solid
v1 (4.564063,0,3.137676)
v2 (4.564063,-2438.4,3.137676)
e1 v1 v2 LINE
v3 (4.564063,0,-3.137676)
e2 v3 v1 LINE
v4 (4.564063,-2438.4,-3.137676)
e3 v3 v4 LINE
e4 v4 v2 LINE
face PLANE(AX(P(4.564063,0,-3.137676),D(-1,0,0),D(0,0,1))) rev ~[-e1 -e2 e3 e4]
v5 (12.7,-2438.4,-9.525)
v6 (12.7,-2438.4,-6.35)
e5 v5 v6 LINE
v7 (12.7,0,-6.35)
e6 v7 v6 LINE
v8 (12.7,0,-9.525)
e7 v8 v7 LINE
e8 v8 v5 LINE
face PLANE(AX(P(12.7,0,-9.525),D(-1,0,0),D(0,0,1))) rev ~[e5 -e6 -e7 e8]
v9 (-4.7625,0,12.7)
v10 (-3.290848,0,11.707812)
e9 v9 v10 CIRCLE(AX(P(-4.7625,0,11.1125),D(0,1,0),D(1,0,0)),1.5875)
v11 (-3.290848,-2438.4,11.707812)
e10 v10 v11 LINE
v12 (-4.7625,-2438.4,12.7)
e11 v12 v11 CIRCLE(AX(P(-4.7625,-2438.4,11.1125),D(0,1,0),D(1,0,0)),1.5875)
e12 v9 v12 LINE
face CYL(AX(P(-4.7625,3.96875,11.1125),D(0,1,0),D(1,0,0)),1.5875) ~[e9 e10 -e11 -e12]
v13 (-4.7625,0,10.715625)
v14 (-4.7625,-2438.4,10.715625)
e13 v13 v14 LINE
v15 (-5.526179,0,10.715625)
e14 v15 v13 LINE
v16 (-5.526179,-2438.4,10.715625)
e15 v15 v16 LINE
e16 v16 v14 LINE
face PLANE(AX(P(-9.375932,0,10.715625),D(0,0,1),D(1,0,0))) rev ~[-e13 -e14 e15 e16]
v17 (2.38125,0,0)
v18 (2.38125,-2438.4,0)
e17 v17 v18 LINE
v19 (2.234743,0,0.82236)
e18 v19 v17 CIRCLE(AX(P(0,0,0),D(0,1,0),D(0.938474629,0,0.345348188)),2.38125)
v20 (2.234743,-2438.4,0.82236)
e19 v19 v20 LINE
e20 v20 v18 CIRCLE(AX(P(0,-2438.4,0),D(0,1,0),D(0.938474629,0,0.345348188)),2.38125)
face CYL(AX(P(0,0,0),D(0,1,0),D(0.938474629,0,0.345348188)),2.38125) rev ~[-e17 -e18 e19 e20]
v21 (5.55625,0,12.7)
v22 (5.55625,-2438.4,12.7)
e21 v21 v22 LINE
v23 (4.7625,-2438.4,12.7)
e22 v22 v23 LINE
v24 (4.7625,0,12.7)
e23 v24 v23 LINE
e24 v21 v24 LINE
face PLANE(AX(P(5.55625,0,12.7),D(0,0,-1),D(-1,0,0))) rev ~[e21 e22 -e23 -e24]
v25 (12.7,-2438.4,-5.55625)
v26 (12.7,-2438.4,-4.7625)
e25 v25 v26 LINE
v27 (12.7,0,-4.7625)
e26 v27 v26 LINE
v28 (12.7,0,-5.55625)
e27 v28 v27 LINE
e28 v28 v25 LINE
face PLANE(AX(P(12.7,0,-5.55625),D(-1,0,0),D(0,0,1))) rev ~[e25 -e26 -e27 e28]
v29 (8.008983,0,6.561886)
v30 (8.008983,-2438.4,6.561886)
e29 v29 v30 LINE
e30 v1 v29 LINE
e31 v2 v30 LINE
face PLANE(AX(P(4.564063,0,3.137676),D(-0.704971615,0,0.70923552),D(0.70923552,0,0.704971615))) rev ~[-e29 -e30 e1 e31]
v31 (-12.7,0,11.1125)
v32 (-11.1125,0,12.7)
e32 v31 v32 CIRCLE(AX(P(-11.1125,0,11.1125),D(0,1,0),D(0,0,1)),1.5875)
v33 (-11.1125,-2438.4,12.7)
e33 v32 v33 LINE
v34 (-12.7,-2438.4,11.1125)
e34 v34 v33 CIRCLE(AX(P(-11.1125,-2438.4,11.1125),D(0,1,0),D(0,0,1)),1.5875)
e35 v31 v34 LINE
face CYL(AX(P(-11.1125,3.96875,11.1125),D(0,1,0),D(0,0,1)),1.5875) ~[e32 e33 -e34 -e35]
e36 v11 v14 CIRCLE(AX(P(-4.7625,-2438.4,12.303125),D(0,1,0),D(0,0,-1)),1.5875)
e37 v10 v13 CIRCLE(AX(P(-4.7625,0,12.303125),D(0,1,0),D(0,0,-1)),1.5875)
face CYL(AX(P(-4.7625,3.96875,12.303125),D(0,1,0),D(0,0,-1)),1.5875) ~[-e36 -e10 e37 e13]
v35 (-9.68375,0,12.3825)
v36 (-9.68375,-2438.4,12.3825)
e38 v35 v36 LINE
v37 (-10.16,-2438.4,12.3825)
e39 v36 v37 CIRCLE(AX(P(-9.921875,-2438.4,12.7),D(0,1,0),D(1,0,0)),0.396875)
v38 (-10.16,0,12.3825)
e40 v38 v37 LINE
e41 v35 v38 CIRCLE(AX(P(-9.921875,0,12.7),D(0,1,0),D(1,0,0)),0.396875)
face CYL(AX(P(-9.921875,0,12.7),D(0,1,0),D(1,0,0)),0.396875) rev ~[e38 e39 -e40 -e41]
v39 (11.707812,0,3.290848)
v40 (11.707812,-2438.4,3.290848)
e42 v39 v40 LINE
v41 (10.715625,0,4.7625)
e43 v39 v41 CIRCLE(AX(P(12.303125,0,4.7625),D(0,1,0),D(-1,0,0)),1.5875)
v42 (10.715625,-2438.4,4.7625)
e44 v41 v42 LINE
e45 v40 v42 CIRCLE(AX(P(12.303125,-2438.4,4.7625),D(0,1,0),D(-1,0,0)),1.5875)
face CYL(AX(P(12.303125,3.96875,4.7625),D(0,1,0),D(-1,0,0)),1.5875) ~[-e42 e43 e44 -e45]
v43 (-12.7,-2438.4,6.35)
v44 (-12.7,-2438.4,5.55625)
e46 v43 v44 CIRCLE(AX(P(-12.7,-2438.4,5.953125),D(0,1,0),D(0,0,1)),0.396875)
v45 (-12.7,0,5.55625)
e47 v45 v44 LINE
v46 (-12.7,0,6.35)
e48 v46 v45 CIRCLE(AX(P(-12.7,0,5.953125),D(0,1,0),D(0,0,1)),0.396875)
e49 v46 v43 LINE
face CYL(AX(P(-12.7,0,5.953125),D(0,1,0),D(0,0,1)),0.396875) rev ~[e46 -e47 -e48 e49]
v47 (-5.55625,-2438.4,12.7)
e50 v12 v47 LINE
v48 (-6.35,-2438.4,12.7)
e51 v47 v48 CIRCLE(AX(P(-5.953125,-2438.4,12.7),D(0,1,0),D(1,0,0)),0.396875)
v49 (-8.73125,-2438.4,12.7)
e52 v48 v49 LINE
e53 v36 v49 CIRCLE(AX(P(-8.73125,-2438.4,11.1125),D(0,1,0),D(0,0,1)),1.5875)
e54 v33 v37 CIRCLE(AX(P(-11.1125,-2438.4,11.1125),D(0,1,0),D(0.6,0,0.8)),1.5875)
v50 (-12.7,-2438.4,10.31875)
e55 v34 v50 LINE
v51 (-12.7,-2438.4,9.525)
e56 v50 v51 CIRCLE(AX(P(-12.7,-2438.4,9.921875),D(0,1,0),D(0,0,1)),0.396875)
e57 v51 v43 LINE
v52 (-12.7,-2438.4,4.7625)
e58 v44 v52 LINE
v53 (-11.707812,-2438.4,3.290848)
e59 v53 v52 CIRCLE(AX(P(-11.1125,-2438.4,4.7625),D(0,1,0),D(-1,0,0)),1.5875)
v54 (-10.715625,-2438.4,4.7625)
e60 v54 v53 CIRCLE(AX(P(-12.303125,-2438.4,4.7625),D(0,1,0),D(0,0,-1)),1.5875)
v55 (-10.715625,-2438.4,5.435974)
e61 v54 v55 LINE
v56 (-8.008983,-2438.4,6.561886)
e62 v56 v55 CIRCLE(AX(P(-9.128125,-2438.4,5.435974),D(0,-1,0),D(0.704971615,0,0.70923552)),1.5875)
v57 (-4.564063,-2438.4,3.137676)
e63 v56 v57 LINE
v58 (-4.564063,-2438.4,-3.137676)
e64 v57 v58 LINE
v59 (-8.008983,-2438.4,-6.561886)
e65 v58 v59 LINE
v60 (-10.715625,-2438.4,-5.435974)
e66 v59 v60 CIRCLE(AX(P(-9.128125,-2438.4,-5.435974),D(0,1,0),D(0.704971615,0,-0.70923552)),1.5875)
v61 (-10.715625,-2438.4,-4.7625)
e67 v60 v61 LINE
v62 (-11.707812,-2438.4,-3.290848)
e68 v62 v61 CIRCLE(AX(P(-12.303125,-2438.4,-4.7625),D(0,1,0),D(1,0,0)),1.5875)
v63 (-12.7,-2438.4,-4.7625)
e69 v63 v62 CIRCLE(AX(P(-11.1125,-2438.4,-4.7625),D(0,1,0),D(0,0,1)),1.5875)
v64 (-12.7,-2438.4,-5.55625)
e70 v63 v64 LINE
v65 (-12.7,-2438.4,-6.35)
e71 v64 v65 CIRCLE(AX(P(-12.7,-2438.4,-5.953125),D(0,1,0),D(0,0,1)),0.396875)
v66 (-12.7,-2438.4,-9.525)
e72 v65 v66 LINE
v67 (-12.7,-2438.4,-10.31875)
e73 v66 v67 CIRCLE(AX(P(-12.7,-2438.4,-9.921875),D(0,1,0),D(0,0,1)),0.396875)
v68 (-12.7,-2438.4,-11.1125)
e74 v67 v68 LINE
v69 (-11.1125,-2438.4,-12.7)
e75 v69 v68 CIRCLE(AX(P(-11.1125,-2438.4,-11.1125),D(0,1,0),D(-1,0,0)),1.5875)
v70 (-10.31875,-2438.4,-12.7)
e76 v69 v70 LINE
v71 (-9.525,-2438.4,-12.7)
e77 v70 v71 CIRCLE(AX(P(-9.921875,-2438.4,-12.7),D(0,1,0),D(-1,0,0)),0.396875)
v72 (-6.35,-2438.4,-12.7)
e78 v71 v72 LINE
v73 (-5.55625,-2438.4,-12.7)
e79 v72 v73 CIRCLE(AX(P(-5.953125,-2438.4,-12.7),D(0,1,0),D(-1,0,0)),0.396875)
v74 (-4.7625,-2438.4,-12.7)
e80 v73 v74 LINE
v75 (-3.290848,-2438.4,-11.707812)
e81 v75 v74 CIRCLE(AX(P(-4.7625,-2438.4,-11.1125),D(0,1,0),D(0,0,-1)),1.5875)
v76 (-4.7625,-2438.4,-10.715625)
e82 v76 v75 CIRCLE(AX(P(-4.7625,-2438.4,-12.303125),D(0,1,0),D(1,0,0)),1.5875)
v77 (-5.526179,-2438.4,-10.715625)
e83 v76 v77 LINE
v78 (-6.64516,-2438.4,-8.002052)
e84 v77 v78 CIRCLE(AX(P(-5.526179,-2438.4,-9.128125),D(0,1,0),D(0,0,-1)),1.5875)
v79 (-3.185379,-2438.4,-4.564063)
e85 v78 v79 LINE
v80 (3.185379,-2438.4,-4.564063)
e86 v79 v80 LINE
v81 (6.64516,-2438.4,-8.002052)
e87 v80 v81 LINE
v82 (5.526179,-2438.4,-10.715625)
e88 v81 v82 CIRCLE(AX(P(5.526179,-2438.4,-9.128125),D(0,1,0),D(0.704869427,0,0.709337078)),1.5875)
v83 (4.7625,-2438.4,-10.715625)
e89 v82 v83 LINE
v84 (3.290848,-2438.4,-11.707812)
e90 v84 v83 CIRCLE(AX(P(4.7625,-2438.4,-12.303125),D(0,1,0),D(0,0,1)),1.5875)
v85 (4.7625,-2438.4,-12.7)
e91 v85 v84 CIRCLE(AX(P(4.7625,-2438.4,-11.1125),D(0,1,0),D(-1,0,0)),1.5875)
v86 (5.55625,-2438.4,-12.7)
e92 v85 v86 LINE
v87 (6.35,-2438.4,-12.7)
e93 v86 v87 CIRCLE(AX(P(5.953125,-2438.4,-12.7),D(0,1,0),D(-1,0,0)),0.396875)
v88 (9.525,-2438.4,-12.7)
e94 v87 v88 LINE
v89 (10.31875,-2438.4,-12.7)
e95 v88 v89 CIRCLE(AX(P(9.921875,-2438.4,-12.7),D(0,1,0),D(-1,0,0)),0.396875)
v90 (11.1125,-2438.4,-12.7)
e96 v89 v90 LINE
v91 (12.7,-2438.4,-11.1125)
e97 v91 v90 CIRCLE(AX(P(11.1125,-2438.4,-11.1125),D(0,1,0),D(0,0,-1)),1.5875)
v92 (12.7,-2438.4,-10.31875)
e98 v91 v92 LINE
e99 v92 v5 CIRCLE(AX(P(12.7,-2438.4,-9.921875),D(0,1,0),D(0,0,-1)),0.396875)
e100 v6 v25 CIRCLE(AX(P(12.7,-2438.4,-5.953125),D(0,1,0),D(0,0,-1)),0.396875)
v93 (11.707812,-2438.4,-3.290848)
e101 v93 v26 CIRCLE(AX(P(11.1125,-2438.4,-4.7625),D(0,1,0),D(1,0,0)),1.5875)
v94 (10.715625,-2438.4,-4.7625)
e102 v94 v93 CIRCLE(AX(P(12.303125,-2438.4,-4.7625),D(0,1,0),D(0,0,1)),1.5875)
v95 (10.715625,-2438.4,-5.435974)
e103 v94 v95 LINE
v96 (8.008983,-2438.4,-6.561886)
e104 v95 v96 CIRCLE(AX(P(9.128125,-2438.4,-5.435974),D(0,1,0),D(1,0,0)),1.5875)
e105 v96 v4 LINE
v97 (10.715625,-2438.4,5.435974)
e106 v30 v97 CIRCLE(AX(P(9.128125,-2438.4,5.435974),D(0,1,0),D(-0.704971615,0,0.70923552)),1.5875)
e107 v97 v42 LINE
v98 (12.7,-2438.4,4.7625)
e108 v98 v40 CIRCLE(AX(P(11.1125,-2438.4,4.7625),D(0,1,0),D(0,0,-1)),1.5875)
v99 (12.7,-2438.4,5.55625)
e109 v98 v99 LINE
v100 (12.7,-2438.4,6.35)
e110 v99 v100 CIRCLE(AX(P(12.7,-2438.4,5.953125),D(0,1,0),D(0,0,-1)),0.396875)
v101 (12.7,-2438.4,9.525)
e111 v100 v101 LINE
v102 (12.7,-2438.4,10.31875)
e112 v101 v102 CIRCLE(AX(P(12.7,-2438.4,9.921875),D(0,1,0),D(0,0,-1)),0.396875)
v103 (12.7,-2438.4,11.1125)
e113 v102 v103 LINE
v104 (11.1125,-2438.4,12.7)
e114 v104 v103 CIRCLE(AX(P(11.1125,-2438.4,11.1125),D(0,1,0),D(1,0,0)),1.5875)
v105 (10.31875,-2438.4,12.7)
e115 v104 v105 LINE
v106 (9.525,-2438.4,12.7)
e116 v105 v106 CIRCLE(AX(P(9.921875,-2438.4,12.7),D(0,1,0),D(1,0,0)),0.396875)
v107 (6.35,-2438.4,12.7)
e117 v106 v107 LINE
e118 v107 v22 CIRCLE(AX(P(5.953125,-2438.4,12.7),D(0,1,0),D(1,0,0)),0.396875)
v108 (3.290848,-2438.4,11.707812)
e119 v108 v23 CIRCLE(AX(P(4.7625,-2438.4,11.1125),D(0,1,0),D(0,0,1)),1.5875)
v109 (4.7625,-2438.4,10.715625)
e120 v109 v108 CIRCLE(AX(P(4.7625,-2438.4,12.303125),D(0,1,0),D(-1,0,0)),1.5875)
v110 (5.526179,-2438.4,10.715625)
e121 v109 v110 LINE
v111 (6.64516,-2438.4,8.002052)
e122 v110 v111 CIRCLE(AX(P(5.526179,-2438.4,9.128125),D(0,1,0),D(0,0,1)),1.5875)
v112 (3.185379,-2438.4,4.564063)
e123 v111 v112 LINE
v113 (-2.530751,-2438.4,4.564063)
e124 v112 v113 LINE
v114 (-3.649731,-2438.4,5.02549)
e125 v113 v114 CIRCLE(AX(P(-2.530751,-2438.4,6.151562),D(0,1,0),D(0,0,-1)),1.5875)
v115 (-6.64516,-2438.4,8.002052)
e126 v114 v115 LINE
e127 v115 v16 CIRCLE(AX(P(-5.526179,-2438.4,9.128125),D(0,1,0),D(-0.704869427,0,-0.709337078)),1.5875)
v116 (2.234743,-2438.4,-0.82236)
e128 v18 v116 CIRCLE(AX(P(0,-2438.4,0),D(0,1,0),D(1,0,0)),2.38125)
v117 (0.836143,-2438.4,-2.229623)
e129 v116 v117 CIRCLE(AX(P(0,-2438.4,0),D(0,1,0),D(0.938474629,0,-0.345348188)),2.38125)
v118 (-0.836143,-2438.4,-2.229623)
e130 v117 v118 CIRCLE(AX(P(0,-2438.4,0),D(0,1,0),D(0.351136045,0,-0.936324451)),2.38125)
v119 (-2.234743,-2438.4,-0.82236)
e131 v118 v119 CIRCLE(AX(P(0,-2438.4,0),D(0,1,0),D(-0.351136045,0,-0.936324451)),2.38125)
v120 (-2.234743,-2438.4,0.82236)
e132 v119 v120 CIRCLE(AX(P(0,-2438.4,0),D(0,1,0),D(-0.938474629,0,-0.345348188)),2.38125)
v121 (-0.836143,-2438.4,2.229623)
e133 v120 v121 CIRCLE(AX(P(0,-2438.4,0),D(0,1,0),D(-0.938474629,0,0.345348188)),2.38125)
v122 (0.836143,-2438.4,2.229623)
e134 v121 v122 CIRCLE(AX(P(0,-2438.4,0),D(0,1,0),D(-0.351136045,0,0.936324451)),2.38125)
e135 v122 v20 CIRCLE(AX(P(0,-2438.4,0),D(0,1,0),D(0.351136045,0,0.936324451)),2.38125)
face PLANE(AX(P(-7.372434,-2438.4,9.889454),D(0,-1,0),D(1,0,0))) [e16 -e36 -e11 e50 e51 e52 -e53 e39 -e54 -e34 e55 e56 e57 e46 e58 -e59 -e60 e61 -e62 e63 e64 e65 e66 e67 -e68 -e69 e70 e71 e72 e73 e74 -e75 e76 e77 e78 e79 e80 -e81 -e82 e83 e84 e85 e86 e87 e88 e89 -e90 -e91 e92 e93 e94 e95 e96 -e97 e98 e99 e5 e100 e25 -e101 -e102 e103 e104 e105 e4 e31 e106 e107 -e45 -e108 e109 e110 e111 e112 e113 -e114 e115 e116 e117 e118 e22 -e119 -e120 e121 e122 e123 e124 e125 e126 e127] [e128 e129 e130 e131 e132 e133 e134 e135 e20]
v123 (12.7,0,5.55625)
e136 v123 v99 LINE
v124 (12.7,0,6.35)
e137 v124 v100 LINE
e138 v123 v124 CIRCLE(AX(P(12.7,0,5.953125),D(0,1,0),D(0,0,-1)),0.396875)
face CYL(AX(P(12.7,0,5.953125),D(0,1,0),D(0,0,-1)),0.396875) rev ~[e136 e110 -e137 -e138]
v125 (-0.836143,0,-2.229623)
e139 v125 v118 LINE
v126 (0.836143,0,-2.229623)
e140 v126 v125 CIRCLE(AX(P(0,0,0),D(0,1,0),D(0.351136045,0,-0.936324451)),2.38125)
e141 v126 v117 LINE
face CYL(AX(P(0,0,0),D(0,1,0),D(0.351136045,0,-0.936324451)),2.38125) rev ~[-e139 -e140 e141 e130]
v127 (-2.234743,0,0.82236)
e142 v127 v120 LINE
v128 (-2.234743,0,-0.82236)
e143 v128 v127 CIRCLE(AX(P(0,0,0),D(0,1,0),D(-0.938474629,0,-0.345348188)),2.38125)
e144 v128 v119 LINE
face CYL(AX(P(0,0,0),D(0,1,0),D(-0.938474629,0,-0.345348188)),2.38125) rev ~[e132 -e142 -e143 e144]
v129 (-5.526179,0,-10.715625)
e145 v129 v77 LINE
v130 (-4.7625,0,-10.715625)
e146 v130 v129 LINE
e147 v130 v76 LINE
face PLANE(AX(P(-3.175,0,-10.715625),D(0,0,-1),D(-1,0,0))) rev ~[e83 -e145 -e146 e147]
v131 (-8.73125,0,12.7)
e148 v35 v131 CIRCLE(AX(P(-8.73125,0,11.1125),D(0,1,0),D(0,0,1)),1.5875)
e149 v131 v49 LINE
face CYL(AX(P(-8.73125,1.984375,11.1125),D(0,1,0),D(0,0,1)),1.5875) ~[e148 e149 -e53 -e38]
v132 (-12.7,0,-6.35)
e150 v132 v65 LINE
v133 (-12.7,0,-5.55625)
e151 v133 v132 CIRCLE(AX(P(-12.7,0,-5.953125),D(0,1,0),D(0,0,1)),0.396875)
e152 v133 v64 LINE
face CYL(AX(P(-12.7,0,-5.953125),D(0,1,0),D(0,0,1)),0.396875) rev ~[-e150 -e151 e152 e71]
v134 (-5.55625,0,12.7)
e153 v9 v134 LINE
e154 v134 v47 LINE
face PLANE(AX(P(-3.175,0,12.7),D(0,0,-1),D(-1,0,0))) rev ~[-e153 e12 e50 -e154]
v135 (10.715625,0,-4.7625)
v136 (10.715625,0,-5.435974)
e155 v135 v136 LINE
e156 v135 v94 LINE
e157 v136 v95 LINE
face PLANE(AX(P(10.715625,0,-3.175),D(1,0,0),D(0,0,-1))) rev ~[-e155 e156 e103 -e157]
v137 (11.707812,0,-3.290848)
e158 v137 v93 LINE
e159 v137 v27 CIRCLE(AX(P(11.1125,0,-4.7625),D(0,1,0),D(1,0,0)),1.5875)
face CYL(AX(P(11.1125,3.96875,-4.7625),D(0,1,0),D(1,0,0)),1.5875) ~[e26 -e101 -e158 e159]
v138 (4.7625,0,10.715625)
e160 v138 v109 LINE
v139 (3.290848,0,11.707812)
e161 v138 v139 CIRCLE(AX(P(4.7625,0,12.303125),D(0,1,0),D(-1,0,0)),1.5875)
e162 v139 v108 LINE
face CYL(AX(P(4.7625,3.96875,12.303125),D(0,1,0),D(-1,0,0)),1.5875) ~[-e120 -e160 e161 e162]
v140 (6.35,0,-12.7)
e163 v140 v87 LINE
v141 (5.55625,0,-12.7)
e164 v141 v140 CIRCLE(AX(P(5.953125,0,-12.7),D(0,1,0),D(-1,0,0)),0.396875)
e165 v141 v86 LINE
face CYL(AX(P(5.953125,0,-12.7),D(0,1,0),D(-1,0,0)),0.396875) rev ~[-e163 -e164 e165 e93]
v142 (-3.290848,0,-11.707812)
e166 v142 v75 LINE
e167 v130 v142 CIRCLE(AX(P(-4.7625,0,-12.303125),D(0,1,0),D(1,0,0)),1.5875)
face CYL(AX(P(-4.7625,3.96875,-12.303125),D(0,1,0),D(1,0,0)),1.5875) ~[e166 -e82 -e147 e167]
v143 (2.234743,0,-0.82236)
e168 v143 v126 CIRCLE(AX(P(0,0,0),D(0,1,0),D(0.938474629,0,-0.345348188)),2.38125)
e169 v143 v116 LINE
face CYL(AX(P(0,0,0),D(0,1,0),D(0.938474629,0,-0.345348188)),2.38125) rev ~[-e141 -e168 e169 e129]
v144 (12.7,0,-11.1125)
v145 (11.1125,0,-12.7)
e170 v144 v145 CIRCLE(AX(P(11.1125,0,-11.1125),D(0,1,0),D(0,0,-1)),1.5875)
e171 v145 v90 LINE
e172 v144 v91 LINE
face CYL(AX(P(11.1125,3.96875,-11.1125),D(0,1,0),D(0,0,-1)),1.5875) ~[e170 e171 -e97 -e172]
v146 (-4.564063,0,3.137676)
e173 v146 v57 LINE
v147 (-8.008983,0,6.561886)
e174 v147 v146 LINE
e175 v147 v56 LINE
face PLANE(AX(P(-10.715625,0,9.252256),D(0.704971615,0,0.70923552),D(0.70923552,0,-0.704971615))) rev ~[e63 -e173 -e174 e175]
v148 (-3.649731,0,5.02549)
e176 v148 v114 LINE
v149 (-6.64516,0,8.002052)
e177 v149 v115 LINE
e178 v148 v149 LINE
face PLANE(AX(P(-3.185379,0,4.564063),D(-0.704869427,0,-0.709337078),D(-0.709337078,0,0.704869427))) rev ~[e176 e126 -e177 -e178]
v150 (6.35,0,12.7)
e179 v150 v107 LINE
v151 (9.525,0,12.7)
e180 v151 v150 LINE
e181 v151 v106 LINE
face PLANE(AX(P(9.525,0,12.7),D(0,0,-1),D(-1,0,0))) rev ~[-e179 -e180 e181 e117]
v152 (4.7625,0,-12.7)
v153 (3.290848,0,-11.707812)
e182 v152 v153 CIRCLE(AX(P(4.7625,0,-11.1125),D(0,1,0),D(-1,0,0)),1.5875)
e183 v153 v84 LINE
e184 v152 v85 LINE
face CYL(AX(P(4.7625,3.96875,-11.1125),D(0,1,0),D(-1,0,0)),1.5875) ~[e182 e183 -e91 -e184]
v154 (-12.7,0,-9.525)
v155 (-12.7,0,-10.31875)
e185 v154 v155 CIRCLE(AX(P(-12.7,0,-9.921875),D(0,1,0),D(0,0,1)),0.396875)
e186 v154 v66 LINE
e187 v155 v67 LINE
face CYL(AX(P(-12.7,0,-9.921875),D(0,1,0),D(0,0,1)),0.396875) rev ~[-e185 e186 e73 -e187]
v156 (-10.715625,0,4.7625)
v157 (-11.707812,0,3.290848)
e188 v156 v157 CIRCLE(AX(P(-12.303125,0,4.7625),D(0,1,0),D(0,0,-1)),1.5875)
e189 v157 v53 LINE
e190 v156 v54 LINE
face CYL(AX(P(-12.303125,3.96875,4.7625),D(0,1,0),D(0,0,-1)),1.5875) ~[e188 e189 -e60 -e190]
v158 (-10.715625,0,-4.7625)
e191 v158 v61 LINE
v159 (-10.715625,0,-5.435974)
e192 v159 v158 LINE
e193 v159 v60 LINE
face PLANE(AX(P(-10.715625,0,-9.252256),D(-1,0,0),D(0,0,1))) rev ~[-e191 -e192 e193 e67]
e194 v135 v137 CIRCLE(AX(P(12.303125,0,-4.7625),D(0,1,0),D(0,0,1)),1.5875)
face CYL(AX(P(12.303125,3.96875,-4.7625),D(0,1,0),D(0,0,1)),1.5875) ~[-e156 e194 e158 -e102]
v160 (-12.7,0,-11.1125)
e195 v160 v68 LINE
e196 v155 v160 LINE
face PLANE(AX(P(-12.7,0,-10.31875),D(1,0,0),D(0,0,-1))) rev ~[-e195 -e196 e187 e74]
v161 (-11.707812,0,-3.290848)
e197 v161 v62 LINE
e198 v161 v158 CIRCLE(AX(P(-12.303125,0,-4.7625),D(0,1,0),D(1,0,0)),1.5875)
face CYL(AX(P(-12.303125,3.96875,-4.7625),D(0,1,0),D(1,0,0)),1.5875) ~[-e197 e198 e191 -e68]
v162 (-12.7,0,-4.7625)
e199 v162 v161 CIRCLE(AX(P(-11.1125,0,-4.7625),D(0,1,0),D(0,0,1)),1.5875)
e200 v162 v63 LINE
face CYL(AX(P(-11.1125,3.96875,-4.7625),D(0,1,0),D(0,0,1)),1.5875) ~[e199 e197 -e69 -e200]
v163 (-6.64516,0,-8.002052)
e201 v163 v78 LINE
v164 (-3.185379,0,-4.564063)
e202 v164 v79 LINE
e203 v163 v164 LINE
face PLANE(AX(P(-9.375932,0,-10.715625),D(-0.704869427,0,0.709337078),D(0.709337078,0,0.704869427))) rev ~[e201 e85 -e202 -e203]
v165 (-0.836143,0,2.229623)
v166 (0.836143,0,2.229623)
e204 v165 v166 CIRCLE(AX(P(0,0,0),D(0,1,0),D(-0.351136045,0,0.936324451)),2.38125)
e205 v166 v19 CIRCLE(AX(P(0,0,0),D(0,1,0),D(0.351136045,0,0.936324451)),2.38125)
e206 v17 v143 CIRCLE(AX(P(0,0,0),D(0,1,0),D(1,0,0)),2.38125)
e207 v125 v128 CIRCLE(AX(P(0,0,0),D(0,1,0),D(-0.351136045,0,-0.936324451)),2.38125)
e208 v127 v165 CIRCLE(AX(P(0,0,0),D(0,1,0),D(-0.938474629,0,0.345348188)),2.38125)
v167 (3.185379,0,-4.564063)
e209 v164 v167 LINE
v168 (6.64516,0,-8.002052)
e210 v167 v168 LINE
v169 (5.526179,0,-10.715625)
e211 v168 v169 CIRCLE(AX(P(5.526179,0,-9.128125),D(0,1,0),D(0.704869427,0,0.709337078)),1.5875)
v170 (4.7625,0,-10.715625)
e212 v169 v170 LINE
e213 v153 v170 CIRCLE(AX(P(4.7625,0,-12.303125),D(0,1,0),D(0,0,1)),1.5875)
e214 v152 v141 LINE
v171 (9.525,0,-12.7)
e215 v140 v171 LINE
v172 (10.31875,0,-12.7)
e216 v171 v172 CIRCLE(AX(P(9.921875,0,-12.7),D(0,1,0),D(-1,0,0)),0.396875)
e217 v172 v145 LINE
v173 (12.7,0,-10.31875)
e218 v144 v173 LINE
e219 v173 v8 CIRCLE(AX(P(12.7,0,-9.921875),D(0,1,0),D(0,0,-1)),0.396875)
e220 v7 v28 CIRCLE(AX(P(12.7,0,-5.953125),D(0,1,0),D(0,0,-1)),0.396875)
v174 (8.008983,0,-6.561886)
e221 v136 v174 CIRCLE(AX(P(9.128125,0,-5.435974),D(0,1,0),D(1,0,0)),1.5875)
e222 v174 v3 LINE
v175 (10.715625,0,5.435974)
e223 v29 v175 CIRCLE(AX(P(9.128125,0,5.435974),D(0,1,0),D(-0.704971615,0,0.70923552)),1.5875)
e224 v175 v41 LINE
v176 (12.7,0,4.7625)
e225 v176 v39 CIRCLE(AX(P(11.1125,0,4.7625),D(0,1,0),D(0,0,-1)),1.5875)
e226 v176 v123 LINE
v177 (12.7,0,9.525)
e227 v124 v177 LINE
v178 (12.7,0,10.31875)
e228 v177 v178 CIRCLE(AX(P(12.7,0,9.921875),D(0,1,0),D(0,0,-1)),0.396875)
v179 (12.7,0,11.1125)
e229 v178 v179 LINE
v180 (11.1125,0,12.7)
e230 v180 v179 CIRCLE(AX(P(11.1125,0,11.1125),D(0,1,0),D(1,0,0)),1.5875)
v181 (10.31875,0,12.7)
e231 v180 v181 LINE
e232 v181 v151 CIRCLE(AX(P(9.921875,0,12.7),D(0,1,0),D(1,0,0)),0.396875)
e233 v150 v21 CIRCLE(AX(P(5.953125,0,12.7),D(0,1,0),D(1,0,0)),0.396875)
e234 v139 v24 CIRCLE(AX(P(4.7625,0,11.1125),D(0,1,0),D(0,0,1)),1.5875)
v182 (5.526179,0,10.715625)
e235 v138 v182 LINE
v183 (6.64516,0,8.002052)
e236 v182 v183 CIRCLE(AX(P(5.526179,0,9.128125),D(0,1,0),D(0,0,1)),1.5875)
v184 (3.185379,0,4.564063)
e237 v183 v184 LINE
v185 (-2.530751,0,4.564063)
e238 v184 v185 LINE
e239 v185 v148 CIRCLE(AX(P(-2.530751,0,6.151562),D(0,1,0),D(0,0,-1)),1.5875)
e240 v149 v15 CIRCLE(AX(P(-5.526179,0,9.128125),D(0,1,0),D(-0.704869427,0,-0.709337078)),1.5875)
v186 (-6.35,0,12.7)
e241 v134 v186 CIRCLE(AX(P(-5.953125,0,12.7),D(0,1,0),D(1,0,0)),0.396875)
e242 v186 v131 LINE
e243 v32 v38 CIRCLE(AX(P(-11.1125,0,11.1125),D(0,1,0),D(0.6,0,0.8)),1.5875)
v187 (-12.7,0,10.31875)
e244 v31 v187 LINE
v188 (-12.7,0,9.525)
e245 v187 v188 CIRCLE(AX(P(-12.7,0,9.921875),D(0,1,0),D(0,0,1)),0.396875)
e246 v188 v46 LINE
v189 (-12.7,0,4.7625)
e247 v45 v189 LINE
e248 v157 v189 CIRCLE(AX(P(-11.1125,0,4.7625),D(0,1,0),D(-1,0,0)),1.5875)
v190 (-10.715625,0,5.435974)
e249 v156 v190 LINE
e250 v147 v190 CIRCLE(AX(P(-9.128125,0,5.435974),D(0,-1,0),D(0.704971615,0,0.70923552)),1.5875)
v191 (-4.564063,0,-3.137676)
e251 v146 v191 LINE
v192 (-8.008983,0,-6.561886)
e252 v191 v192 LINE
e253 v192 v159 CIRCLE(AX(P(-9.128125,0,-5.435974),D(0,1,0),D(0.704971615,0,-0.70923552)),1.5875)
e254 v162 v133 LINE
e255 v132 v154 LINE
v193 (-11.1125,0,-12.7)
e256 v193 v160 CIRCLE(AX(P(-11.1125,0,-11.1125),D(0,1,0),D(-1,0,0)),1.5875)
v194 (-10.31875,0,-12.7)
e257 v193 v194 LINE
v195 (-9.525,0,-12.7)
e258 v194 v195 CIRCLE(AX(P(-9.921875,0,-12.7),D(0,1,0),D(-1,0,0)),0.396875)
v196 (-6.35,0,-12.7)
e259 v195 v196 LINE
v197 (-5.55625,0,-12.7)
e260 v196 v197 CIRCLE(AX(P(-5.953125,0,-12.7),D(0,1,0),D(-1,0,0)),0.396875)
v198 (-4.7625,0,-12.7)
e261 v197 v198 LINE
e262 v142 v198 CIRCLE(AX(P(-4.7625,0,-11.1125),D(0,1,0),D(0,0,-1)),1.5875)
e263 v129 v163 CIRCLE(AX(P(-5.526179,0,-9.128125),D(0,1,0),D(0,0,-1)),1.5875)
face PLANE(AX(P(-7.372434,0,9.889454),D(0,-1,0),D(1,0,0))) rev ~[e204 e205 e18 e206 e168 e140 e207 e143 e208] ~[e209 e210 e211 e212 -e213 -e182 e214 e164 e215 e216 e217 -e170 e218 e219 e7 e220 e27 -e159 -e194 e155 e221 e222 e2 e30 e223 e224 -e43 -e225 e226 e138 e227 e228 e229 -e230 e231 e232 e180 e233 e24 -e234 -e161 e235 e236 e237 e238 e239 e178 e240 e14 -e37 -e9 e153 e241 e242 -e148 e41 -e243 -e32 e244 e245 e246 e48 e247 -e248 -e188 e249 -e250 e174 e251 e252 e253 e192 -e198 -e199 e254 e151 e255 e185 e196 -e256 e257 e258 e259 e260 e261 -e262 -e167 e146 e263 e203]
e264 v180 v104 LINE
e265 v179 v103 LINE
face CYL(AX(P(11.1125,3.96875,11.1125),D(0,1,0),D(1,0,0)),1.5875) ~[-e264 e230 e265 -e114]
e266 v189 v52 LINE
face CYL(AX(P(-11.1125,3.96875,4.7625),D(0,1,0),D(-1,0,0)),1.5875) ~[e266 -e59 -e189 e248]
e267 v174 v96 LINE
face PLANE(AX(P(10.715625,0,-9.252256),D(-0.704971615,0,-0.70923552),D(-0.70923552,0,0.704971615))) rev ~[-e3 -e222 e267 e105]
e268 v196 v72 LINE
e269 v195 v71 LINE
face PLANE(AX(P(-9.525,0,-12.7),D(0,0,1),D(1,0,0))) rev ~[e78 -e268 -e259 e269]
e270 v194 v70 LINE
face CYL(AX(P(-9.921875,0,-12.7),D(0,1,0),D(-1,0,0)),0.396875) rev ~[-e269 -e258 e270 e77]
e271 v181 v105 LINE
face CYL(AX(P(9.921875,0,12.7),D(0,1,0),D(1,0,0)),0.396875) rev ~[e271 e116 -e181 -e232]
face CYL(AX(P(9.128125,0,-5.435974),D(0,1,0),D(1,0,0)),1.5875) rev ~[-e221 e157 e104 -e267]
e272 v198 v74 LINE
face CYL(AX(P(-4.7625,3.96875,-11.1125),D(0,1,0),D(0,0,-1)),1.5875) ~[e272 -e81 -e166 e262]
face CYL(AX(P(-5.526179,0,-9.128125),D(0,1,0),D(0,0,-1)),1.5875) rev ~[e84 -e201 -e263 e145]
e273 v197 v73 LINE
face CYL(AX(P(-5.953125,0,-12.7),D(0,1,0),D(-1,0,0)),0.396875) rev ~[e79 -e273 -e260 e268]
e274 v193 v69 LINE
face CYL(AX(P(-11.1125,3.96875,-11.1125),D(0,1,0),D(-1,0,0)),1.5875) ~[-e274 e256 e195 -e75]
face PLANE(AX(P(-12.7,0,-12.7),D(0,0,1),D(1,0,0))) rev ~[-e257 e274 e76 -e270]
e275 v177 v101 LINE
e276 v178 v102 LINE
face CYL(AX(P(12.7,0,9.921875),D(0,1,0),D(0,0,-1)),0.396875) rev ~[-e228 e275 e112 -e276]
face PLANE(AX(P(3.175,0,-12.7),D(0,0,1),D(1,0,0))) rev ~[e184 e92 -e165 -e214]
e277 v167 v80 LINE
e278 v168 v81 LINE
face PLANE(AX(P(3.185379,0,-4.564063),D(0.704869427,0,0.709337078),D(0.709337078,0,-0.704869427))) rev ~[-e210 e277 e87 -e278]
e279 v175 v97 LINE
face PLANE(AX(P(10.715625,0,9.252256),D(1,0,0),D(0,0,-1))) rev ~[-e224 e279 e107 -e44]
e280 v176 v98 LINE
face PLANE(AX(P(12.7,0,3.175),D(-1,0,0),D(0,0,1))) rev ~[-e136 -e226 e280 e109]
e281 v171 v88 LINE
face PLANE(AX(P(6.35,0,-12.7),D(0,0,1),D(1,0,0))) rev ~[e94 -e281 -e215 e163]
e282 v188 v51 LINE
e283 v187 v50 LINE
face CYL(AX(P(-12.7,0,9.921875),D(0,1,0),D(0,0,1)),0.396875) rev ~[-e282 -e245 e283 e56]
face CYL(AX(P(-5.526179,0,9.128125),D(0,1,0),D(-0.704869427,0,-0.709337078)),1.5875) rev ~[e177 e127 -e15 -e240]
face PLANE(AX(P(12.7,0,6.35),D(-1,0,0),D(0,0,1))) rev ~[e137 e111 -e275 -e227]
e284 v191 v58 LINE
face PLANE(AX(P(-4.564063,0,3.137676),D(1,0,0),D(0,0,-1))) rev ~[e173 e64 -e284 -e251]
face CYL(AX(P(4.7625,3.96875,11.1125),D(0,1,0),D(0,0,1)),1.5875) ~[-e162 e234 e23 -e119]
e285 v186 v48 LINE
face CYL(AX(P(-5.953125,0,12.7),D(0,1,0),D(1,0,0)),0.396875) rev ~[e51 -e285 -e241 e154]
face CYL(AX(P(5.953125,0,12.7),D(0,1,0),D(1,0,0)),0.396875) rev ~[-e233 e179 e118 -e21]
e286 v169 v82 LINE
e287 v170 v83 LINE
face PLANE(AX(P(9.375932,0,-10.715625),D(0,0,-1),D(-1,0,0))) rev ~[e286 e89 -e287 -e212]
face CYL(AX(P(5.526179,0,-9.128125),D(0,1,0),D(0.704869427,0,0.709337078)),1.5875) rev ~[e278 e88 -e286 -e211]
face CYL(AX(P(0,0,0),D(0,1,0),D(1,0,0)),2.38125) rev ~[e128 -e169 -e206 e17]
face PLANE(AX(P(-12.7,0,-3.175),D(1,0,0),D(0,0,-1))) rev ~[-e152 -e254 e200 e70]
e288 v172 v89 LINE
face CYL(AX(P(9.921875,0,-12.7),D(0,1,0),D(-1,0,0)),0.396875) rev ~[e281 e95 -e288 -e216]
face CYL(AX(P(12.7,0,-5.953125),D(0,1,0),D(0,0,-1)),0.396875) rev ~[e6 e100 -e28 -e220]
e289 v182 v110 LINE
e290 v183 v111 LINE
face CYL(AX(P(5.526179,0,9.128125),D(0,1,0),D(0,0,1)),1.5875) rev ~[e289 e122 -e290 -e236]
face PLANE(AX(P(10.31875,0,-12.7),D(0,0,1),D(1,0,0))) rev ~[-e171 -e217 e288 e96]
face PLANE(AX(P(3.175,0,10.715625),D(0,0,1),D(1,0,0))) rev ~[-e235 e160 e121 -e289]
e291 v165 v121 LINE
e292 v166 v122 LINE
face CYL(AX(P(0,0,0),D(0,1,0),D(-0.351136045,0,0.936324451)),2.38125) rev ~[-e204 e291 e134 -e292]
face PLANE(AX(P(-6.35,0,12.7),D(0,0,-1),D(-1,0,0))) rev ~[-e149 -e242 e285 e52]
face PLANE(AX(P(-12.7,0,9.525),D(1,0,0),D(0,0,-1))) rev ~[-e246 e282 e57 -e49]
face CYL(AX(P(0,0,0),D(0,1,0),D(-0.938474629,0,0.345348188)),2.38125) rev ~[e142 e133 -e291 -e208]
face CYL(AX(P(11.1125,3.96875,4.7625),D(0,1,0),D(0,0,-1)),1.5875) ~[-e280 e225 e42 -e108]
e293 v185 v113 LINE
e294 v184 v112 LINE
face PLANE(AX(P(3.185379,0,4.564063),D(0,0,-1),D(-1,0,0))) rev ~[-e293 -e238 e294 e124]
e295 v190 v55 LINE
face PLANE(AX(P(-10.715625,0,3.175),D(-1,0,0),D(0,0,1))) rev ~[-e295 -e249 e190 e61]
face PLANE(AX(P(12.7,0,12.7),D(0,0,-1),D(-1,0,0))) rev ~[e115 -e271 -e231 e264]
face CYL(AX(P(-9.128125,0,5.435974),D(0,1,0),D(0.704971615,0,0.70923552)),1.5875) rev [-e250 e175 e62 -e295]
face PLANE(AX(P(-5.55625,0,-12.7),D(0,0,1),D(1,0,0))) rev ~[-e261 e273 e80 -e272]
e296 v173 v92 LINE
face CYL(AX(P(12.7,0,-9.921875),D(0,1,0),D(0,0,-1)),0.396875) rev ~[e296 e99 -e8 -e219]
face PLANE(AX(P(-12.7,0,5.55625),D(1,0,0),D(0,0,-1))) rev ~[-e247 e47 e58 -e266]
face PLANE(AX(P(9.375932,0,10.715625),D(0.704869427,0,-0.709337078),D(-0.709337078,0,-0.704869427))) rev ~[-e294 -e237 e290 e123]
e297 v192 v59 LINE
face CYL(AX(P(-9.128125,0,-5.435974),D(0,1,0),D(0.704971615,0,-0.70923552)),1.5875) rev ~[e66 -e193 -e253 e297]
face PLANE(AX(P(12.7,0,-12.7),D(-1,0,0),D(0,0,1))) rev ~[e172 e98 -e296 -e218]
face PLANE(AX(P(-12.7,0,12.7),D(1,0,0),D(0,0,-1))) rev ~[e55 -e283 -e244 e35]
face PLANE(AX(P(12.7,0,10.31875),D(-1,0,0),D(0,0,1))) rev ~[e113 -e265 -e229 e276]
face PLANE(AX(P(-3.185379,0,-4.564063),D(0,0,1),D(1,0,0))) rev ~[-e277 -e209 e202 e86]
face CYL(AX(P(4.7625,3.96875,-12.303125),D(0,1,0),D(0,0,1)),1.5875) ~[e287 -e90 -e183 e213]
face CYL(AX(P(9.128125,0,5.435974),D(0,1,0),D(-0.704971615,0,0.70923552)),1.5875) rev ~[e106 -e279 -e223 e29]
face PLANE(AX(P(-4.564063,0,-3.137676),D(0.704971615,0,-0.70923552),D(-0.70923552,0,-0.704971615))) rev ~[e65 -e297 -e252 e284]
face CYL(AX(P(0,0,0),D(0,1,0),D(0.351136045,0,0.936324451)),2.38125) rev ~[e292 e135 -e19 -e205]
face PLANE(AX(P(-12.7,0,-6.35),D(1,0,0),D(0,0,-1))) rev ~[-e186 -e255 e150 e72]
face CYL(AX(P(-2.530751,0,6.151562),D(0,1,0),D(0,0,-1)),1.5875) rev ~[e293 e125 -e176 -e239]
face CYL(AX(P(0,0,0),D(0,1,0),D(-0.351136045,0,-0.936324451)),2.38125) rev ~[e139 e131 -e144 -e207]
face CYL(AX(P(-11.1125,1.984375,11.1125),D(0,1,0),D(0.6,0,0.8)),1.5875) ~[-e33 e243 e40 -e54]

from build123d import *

# Parameters (mm, degrees)
F1_DEPTH    = 2438.4
F2_T1_DEPTH = 2438.4
F2_T3_DEPTH = 2446.3375
F2_T5_DEPTH = 2442.36875


# Not quite as in the source:
# - a fillet or chamfer that OpenCascade refuses, or shapes differently, is made with other operations: its cross-section is extruded or revolved along the edge and cut away or added


with BuildPart() as f1:
    # F0 (on Front) → F1 (new body)
    with BuildSketch(Plane.XZ):
        with BuildLine():
            ThreePointArc((-0.8361427067, 2.2296225996), (0, 2.38125), (0.8361427067, 2.2296225996))
            Line((0.8361427067, 2.2296225996), (3.1853789104, 4.5640625))
            Line((3.1853789104, 4.5640625), (-3.1853789104, 4.5640625))
            Line((-3.1853789104, 4.5640625), (-0.8361427067, 2.2296225996))
        make_face()
        with BuildLine():
            ThreePointArc((-2.2347427098, 0.8223603732), (-1.6889881746, 1.6785918231), (-0.8361427067, 2.2296225996))
            Line((-0.8361427067, 2.2296225996), (-3.1853789104, 4.5640625))
            Line((-3.1853789104, 4.5640625), (-4.5640625, 4.5640625))
            Line((-4.5640625, 4.5640625), (-4.5640625, 3.1376763557))
            Line((-4.5640625, 3.1376763557), (-2.2347427098, 0.8223603732))
        make_face()
        with BuildLine():
            ThreePointArc((-2.2347427098, -0.8223603732), (-2.38125, 0), (-2.2347427098, 0.8223603732))
            Line((-2.2347427098, 0.8223603732), (-4.5640625, 3.1376763557))
            Line((-4.5640625, 3.1376763557), (-4.5640625, -3.1376763557))
            Line((-4.5640625, -3.1376763557), (-2.2347427098, -0.8223603732))
        make_face()
        with BuildLine():
            Line((-3.1853789104, -4.5640625), (-0.8361427067, -2.2296225996))
            ThreePointArc((-0.8361427067, -2.2296225996), (-1.6889881746, -1.6785918231), (-2.2347427098, -0.8223603732))
            Line((-2.2347427098, -0.8223603732), (-4.5640625, -3.1376763557))
            Line((-4.5640625, -3.1376763557), (-4.5640625, -4.5640625))
            Line((-4.5640625, -4.5640625), (-3.1853789104, -4.5640625))
        make_face()
        with BuildLine():
            Line((3.1853789104, -4.5640625), (0.8361427067, -2.2296225996))
            ThreePointArc((0.8361427067, -2.2296225996), (0, -2.38125), (-0.8361427067, -2.2296225996))
            Line((-0.8361427067, -2.2296225996), (-3.1853789104, -4.5640625))
            Line((-3.1853789104, -4.5640625), (3.1853789104, -4.5640625))
        make_face()
        with BuildLine():
            Line((4.5640625, -3.1376763557), (2.2347427098, -0.8223603732))
            ThreePointArc((2.2347427098, -0.8223603732), (1.6889881746, -1.6785918231), (0.8361427067, -2.2296225996))
            Line((0.8361427067, -2.2296225996), (3.1853789104, -4.5640625))
            Line((3.1853789104, -4.5640625), (4.5640625, -4.5640625))
            Line((4.5640625, -4.5640625), (4.5640625, -3.1376763557))
        make_face()
        with BuildLine():
            ThreePointArc((2.2347427098, 0.8223603732), (2.3443370748, 0.4176544533), (2.38125, 0))
            ThreePointArc((2.38125, 0), (2.3443370748, -0.4176544533), (2.2347427098, -0.8223603732))
            Line((2.2347427098, -0.8223603732), (4.5640625, -3.1376763557))
            Line((4.5640625, -3.1376763557), (4.5640625, 3.1376763557))
            Line((4.5640625, 3.1376763557), (2.2347427098, 0.8223603732))
        make_face()
        with BuildLine():
            ThreePointArc((0.8361427067, 2.2296225996), (1.6889881746, 1.6785918231), (2.2347427098, 0.8223603732))
            Line((2.2347427098, 0.8223603732), (4.5640625, 3.1376763557))
            Line((4.5640625, 3.1376763557), (4.5640625, 4.5640625))
            Line((4.5640625, 4.5640625), (3.1853789104, 4.5640625))
            Line((3.1853789104, 4.5640625), (0.8361427067, 2.2296225996))
        make_face()
        Polygon((4.5640625, 4.5640625), (4.5640625, 3.1376763557), (10.715625, 9.2522558281), (12.7, 11.2247008192), (12.7, 12.7), (11.3728841543, 12.7), (9.3759316558, 10.715625), (3.1853789104, 4.5640625), align=None)
        with BuildLine():
            Line((12.7, 11.2247008192), (10.715625, 9.2522558281))
            Line((10.715625, 9.2522558281), (10.715625, 7.14375))
            Line((10.715625, 7.14375), (10.715625, 3.175))
            Line((10.715625, 3.175), (12.7, 3.175))
            Line((12.7, 3.175), (12.7, 5.55625))
            ThreePointArc((12.7, 5.55625), (12.303125, 5.953125), (12.7, 6.35))
            Line((12.7, 6.35), (12.7, 9.525))
            ThreePointArc((12.7, 9.525), (12.303125, 9.921875), (12.7, 10.31875))
            Line((12.7, 10.31875), (12.7, 11.2247008192))
        make_face()
        with BuildLine():
            Line((7.14375, 10.715625), (9.3759316558, 10.715625))
            Line((9.3759316558, 10.715625), (11.3728841543, 12.7))
            Line((11.3728841543, 12.7), (10.31875, 12.7))
            ThreePointArc((10.31875, 12.7), (9.921875, 12.303125), (9.525, 12.7))
            Line((9.525, 12.7), (6.35, 12.7))
            ThreePointArc((6.35, 12.7), (5.953125, 12.303125), (5.55625, 12.7))
            Line((5.55625, 12.7), (3.175, 12.7))
            Line((3.175, 12.7), (3.175, 10.715625))
            Line((3.175, 10.715625), (7.14375, 10.715625))
        make_face()
        with BuildLine():
            Line((-11.3728841543, 12.7), (-9.3759316558, 10.715625))
            Line((-9.3759316558, 10.715625), (-7.14375, 10.715625))
            Line((-7.14375, 10.715625), (-3.175, 10.715625))
            Line((-3.175, 10.715625), (-3.175, 12.7))
            Line((-3.175, 12.7), (-5.55625, 12.7))
            ThreePointArc((-5.55625, 12.7), (-5.953125, 12.303125), (-6.35, 12.7))
            Line((-6.35, 12.7), (-7.14375, 12.7))
            Line((-7.14375, 12.7), (-9.525, 12.7))
            ThreePointArc((-9.525, 12.7), (-9.921875, 12.303125), (-10.31875, 12.7))
            Line((-10.31875, 12.7), (-11.3728841543, 12.7))
        make_face()
        Polygon((-4.5640625, 4.5640625), (-3.1853789104, 4.5640625), (-9.3759316558, 10.715625), (-11.3728841543, 12.7), (-12.7, 11.2247008192), (-10.715625, 9.2522558281), (-4.5640625, 3.1376763557), align=None)
        Polygon((-12.7, 11.2247008192), (-11.3728841543, 12.7), (-12.7, 12.7), align=None)
        with BuildLine():
            Line((-10.715625, 7.14375), (-10.715625, 9.2522558281))
            Line((-10.715625, 9.2522558281), (-12.7, 11.2247008192))
            Line((-12.7, 11.2247008192), (-12.7, 10.31875))
            ThreePointArc((-12.7, 10.31875), (-12.303125, 9.921875), (-12.7, 9.525))
            Line((-12.7, 9.525), (-12.7, 6.35))
            ThreePointArc((-12.7, 6.35), (-12.303125, 5.953125), (-12.7, 5.55625))
            Line((-12.7, 5.55625), (-12.7, 3.175))
            Line((-12.7, 3.175), (-10.715625, 3.175))
            Line((-10.715625, 3.175), (-10.715625, 7.14375))
        make_face()
        with BuildLine():
            Line((-12.7, -11.2247008192), (-10.715625, -9.2522558281))
            Line((-10.715625, -9.2522558281), (-10.715625, -7.14375))
            Line((-10.715625, -7.14375), (-10.715625, -3.175))
            Line((-10.715625, -3.175), (-12.7, -3.175))
            Line((-12.7, -3.175), (-12.7, -5.55625))
            ThreePointArc((-12.7, -5.55625), (-12.303125, -5.953125), (-12.7, -6.35))
            Line((-12.7, -6.35), (-12.7, -9.525))
            ThreePointArc((-12.7, -9.525), (-12.303125, -9.921875), (-12.7, -10.31875))
            Line((-12.7, -10.31875), (-12.7, -11.2247008192))
        make_face()
        Polygon((-9.3759316558, -10.715625), (-3.1853789104, -4.5640625), (-4.5640625, -4.5640625), (-4.5640625, -3.1376763557), (-10.715625, -9.2522558281), (-12.7, -11.2247008192), (-12.7, -12.7), (-11.3728841543, -12.7), align=None)
        with BuildLine():
            Line((-7.14375, -10.715625), (-9.3759316558, -10.715625))
            Line((-9.3759316558, -10.715625), (-11.3728841543, -12.7))
            Line((-11.3728841543, -12.7), (-10.31875, -12.7))
            ThreePointArc((-10.31875, -12.7), (-9.921875, -12.303125), (-9.525, -12.7))
            Line((-9.525, -12.7), (-6.35, -12.7))
            ThreePointArc((-6.35, -12.7), (-5.953125, -12.303125), (-5.55625, -12.7))
            Line((-5.55625, -12.7), (-3.175, -12.7))
            Line((-3.175, -12.7), (-3.175, -10.715625))
            Line((-3.175, -10.715625), (-7.14375, -10.715625))
        make_face()
        with BuildLine():
            Line((11.3728841543, -12.7), (9.3759316558, -10.715625))
            Line((9.3759316558, -10.715625), (7.14375, -10.715625))
            Line((7.14375, -10.715625), (3.175, -10.715625))
            Line((3.175, -10.715625), (3.175, -12.7))
            Line((3.175, -12.7), (5.55625, -12.7))
            ThreePointArc((5.55625, -12.7), (5.953125, -12.303125), (6.35, -12.7))
            Line((6.35, -12.7), (9.525, -12.7))
            ThreePointArc((9.525, -12.7), (9.921875, -12.303125), (10.31875, -12.7))
            Line((10.31875, -12.7), (11.3728841543, -12.7))
        make_face()
        Polygon((10.715625, -9.2522558281), (4.5640625, -3.1376763557), (4.5640625, -4.5640625), (3.1853789104, -4.5640625), (9.3759316558, -10.715625), (11.3728841543, -12.7), (12.7, -12.7), (12.7, -11.2247008192), align=None)
        with BuildLine():
            Line((10.715625, -7.14375), (10.715625, -9.2522558281))
            Line((10.715625, -9.2522558281), (12.7, -11.2247008192))
            Line((12.7, -11.2247008192), (12.7, -10.31875))
            ThreePointArc((12.7, -10.31875), (12.303125, -9.921875), (12.7, -9.525))
            Line((12.7, -9.525), (12.7, -6.35))
            ThreePointArc((12.7, -6.35), (12.303125, -5.953125), (12.7, -5.55625))
            Line((12.7, -5.55625), (12.7, -3.175))
            Line((12.7, -3.175), (10.715625, -3.175))
            Line((10.715625, -3.175), (10.715625, -7.14375))
        make_face()
    extrude(amount=F1_DEPTH)

    # F2: fillet of radius 1.5875 on 31 edges, made by hand

    # F2_s2 → F2_t1 (join)
    with BuildSketch(Plane.XZ):
        with BuildLine():
            ThreePointArc((-6.6451596968, 8.0020523886), (-6.9937960043, 9.7333175229), (-5.5261794807, 10.715625))
            Line((-5.5261794807, 10.715625), (-9.3759316558, 10.715625))
            Line((-9.3759316558, 10.715625), (-6.6451596968, 8.0020523886))
        make_face()
        with BuildLine():
            ThreePointArc((-8.0089825615, 6.5618856508), (-9.7378452755, 6.9017155215), (-10.715625, 5.4359742634))
            Line((-10.715625, 5.4359742634), (-10.715625, 9.2522558281))
            Line((-10.715625, 9.2522558281), (-8.0089825615, 6.5618856508))
        make_face()
        with BuildLine():
            ThreePointArc((5.5261794807, 10.715625), (6.9937960043, 9.7333175229), (6.6451596968, 8.0020523886))
            Line((6.6451596968, 8.0020523886), (9.3759316558, 10.715625))
            Line((9.3759316558, 10.715625), (5.5261794807, 10.715625))
        make_face()
        with BuildLine():
            ThreePointArc((8.0089825615, 6.5618856508), (9.7378452755, 6.9017155215), (10.715625, 5.4359742634))
            Line((10.715625, 5.4359742634), (10.715625, 9.2522558281))
            Line((10.715625, 9.2522558281), (8.0089825615, 6.5618856508))
        make_face()
        with BuildLine():
            ThreePointArc((10.715625, -5.4359742634), (9.7378452755, -6.9017155215), (8.0089825615, -6.5618856508))
            Line((8.0089825615, -6.5618856508), (10.715625, -9.2522558281))
            Line((10.715625, -9.2522558281), (10.715625, -5.4359742634))
        make_face()
        with BuildLine():
            ThreePointArc((6.6451596968, -8.0020523886), (6.9937960043, -9.7333175229), (5.5261794807, -10.715625))
            Line((5.5261794807, -10.715625), (9.3759316558, -10.715625))
            Line((9.3759316558, -10.715625), (6.6451596968, -8.0020523886))
        make_face()
        with BuildLine():
            ThreePointArc((-5.5261794807, -10.715625), (-6.9937960043, -9.7333175229), (-6.6451596968, -8.0020523886))
            Line((-6.6451596968, -8.0020523886), (-9.3759316558, -10.715625))
            Line((-9.3759316558, -10.715625), (-5.5261794807, -10.715625))
        make_face()
        with BuildLine():
            ThreePointArc((-8.0089825615, -6.5618856508), (-9.7378452755, -6.9017155215), (-10.715625, -5.4359742634))
            Line((-10.715625, -5.4359742634), (-10.715625, -9.2522558281))
            Line((-10.715625, -9.2522558281), (-8.0089825615, -6.5618856508))
        make_face()
        with BuildLine():
            ThreePointArc((-2.530750733, 4.5640625), (-3.1359432558, 4.6839459764), (-3.649730949, 5.0254898886))
            Line((-3.649730949, 5.0254898886), (-3.1853789104, 4.5640625))
            Line((-3.1853789104, 4.5640625), (-2.530750733, 4.5640625))
        make_face()
    extrude(amount=F2_T1_DEPTH)

    # F2_s4 → F2_t3 (cut)
    with BuildSketch(Plane.XZ.offset(-3.96875)):
        with BuildLine():
            ThreePointArc((-12.7, -11.1125), (-12.2350320151, -12.2350320151), (-11.1125, -12.7))
            Line((-11.1125, -12.7), (-12.7, -12.7))
            Line((-12.7, -12.7), (-12.7, -11.1125))
        make_face()
        with BuildLine():
            ThreePointArc((11.1125, -12.7), (12.2350320151, -12.2350320151), (12.7, -11.1125))
            Line((12.7, -11.1125), (12.7, -12.7))
            Line((12.7, -12.7), (11.1125, -12.7))
        make_face()
        with BuildLine():
            ThreePointArc((12.7, 11.1125), (12.2350320151, 12.2350320151), (11.1125, 12.7))
            Line((11.1125, 12.7), (12.7, 12.7))
            Line((12.7, 12.7), (12.7, 11.1125))
        make_face()
        with BuildLine():
            ThreePointArc((-12.7, 4.7625), (-12.2350320151, 3.6399679849), (-11.1125, 3.175))
            Line((-11.1125, 3.175), (-12.7, 3.175))
            Line((-12.7, 3.175), (-12.7, 4.7625))
        make_face()
        with BuildLine():
            ThreePointArc((-11.1125, -3.175), (-12.2350320151, -3.6399679849), (-12.7, -4.7625))
            Line((-12.7, -4.7625), (-12.7, -3.175))
            Line((-12.7, -3.175), (-11.1125, -3.175))
        make_face()
        with BuildLine():
            ThreePointArc((-12.303125, 3.175), (-11.1805929849, 3.6399679849), (-10.715625, 4.7625))
            Line((-10.715625, 4.7625), (-10.715625, 3.175))
            Line((-10.715625, 3.175), (-12.303125, 3.175))
        make_face()
        with BuildLine():
            ThreePointArc((-10.715625, -4.7625), (-11.1805929849, -3.6399679849), (-12.303125, -3.175))
            Line((-12.303125, -3.175), (-10.715625, -3.175))
            Line((-10.715625, -3.175), (-10.715625, -4.7625))
        make_face()
        with BuildLine():
            ThreePointArc((-3.175, -12.303125), (-3.6399679849, -11.1805929849), (-4.7625, -10.715625))
            Line((-4.7625, -10.715625), (-3.175, -10.715625))
            Line((-3.175, -10.715625), (-3.175, -12.303125))
        make_face()
        with BuildLine():
            ThreePointArc((-4.7625, -12.7), (-3.6399679849, -12.2350320151), (-3.175, -11.1125))
            Line((-3.175, -11.1125), (-3.175, -12.7))
            Line((-3.175, -12.7), (-4.7625, -12.7))
        make_face()
        with BuildLine():
            ThreePointArc((3.175, -11.1125), (3.6399679849, -12.2350320151), (4.7625, -12.7))
            Line((4.7625, -12.7), (3.175, -12.7))
            Line((3.175, -12.7), (3.175, -11.1125))
        make_face()
        with BuildLine():
            ThreePointArc((4.7625, -10.715625), (3.6399679849, -11.1805929849), (3.175, -12.303125))
            Line((3.175, -12.303125), (3.175, -10.715625))
            Line((3.175, -10.715625), (4.7625, -10.715625))
        make_face()
        with BuildLine():
            ThreePointArc((12.7, -4.7625), (12.2350320151, -3.6399679849), (11.1125, -3.175))
            Line((11.1125, -3.175), (12.7, -3.175))
            Line((12.7, -3.175), (12.7, -4.7625))
        make_face()
        with BuildLine():
            ThreePointArc((11.1125, 3.175), (12.2350320151, 3.6399679849), (12.7, 4.7625))
            Line((12.7, 4.7625), (12.7, 3.175))
            Line((12.7, 3.175), (11.1125, 3.175))
        make_face()
        with BuildLine():
            ThreePointArc((12.303125, -3.175), (11.1805929849, -3.6399679849), (10.715625, -4.7625))
            Line((10.715625, -4.7625), (10.715625, -3.175))
            Line((10.715625, -3.175), (12.303125, -3.175))
        make_face()
        with BuildLine():
            ThreePointArc((10.715625, 4.7625), (11.1805929849, 3.6399679849), (12.303125, 3.175))
            Line((12.303125, 3.175), (10.715625, 3.175))
            Line((10.715625, 3.175), (10.715625, 4.7625))
        make_face()
        with BuildLine():
            ThreePointArc((-4.7625, 10.715625), (-3.6399679849, 11.1805929849), (-3.175, 12.303125))
            Line((-3.175, 12.303125), (-3.175, 10.715625))
            Line((-3.175, 10.715625), (-4.7625, 10.715625))
        make_face()
        with BuildLine():
            ThreePointArc((-3.175, 11.1125), (-3.6399679849, 12.2350320151), (-4.7625, 12.7))
            Line((-4.7625, 12.7), (-3.175, 12.7))
            Line((-3.175, 12.7), (-3.175, 11.1125))
        make_face()
        with BuildLine():
            ThreePointArc((4.7625, 12.7), (3.6399679849, 12.2350320151), (3.175, 11.1125))
            Line((3.175, 11.1125), (3.175, 12.7))
            Line((3.175, 12.7), (4.7625, 12.7))
        make_face()
        with BuildLine():
            ThreePointArc((3.175, 12.303125), (3.6399679849, 11.1805929849), (4.7625, 10.715625))
            Line((4.7625, 10.715625), (3.175, 10.715625))
            Line((3.175, 10.715625), (3.175, 12.303125))
        make_face()
        with BuildLine():
            ThreePointArc((-11.1125, 12.7), (-12.2350320151, 12.2350320151), (-12.7, 11.1125))
            Line((-12.7, 11.1125), (-12.7, 12.7))
            Line((-12.7, 12.7), (-11.1125, 12.7))
        make_face()
    extrude(amount=F2_T3_DEPTH, mode=Mode.SUBTRACT)

    # F2_s6 → F2_t5 (cut)
    with BuildSketch(Plane.XZ.offset(-1.984375)):
        with BuildLine():
            ThreePointArc((-8.73125, 12.7), (-9.2332615786, 12.6185347357), (-9.68375, 12.3825))
            ThreePointArc((-9.68375, 12.3825), (-9.5668992086, 12.5225121043), (-9.525, 12.7))
            Line((-9.525, 12.7), (-8.73125, 12.7))
        make_face()
        with BuildLine():
            ThreePointArc((-10.16, 12.3825), (-10.6104884214, 12.6185347357), (-11.1125, 12.7))
            Line((-11.1125, 12.7), (-10.31875, 12.7))
            ThreePointArc((-10.31875, 12.7), (-10.2768507914, 12.5225121043), (-10.16, 12.3825))
        make_face()
    extrude(amount=F2_T5_DEPTH, mode=Mode.SUBTRACT)


solid = f1.part
